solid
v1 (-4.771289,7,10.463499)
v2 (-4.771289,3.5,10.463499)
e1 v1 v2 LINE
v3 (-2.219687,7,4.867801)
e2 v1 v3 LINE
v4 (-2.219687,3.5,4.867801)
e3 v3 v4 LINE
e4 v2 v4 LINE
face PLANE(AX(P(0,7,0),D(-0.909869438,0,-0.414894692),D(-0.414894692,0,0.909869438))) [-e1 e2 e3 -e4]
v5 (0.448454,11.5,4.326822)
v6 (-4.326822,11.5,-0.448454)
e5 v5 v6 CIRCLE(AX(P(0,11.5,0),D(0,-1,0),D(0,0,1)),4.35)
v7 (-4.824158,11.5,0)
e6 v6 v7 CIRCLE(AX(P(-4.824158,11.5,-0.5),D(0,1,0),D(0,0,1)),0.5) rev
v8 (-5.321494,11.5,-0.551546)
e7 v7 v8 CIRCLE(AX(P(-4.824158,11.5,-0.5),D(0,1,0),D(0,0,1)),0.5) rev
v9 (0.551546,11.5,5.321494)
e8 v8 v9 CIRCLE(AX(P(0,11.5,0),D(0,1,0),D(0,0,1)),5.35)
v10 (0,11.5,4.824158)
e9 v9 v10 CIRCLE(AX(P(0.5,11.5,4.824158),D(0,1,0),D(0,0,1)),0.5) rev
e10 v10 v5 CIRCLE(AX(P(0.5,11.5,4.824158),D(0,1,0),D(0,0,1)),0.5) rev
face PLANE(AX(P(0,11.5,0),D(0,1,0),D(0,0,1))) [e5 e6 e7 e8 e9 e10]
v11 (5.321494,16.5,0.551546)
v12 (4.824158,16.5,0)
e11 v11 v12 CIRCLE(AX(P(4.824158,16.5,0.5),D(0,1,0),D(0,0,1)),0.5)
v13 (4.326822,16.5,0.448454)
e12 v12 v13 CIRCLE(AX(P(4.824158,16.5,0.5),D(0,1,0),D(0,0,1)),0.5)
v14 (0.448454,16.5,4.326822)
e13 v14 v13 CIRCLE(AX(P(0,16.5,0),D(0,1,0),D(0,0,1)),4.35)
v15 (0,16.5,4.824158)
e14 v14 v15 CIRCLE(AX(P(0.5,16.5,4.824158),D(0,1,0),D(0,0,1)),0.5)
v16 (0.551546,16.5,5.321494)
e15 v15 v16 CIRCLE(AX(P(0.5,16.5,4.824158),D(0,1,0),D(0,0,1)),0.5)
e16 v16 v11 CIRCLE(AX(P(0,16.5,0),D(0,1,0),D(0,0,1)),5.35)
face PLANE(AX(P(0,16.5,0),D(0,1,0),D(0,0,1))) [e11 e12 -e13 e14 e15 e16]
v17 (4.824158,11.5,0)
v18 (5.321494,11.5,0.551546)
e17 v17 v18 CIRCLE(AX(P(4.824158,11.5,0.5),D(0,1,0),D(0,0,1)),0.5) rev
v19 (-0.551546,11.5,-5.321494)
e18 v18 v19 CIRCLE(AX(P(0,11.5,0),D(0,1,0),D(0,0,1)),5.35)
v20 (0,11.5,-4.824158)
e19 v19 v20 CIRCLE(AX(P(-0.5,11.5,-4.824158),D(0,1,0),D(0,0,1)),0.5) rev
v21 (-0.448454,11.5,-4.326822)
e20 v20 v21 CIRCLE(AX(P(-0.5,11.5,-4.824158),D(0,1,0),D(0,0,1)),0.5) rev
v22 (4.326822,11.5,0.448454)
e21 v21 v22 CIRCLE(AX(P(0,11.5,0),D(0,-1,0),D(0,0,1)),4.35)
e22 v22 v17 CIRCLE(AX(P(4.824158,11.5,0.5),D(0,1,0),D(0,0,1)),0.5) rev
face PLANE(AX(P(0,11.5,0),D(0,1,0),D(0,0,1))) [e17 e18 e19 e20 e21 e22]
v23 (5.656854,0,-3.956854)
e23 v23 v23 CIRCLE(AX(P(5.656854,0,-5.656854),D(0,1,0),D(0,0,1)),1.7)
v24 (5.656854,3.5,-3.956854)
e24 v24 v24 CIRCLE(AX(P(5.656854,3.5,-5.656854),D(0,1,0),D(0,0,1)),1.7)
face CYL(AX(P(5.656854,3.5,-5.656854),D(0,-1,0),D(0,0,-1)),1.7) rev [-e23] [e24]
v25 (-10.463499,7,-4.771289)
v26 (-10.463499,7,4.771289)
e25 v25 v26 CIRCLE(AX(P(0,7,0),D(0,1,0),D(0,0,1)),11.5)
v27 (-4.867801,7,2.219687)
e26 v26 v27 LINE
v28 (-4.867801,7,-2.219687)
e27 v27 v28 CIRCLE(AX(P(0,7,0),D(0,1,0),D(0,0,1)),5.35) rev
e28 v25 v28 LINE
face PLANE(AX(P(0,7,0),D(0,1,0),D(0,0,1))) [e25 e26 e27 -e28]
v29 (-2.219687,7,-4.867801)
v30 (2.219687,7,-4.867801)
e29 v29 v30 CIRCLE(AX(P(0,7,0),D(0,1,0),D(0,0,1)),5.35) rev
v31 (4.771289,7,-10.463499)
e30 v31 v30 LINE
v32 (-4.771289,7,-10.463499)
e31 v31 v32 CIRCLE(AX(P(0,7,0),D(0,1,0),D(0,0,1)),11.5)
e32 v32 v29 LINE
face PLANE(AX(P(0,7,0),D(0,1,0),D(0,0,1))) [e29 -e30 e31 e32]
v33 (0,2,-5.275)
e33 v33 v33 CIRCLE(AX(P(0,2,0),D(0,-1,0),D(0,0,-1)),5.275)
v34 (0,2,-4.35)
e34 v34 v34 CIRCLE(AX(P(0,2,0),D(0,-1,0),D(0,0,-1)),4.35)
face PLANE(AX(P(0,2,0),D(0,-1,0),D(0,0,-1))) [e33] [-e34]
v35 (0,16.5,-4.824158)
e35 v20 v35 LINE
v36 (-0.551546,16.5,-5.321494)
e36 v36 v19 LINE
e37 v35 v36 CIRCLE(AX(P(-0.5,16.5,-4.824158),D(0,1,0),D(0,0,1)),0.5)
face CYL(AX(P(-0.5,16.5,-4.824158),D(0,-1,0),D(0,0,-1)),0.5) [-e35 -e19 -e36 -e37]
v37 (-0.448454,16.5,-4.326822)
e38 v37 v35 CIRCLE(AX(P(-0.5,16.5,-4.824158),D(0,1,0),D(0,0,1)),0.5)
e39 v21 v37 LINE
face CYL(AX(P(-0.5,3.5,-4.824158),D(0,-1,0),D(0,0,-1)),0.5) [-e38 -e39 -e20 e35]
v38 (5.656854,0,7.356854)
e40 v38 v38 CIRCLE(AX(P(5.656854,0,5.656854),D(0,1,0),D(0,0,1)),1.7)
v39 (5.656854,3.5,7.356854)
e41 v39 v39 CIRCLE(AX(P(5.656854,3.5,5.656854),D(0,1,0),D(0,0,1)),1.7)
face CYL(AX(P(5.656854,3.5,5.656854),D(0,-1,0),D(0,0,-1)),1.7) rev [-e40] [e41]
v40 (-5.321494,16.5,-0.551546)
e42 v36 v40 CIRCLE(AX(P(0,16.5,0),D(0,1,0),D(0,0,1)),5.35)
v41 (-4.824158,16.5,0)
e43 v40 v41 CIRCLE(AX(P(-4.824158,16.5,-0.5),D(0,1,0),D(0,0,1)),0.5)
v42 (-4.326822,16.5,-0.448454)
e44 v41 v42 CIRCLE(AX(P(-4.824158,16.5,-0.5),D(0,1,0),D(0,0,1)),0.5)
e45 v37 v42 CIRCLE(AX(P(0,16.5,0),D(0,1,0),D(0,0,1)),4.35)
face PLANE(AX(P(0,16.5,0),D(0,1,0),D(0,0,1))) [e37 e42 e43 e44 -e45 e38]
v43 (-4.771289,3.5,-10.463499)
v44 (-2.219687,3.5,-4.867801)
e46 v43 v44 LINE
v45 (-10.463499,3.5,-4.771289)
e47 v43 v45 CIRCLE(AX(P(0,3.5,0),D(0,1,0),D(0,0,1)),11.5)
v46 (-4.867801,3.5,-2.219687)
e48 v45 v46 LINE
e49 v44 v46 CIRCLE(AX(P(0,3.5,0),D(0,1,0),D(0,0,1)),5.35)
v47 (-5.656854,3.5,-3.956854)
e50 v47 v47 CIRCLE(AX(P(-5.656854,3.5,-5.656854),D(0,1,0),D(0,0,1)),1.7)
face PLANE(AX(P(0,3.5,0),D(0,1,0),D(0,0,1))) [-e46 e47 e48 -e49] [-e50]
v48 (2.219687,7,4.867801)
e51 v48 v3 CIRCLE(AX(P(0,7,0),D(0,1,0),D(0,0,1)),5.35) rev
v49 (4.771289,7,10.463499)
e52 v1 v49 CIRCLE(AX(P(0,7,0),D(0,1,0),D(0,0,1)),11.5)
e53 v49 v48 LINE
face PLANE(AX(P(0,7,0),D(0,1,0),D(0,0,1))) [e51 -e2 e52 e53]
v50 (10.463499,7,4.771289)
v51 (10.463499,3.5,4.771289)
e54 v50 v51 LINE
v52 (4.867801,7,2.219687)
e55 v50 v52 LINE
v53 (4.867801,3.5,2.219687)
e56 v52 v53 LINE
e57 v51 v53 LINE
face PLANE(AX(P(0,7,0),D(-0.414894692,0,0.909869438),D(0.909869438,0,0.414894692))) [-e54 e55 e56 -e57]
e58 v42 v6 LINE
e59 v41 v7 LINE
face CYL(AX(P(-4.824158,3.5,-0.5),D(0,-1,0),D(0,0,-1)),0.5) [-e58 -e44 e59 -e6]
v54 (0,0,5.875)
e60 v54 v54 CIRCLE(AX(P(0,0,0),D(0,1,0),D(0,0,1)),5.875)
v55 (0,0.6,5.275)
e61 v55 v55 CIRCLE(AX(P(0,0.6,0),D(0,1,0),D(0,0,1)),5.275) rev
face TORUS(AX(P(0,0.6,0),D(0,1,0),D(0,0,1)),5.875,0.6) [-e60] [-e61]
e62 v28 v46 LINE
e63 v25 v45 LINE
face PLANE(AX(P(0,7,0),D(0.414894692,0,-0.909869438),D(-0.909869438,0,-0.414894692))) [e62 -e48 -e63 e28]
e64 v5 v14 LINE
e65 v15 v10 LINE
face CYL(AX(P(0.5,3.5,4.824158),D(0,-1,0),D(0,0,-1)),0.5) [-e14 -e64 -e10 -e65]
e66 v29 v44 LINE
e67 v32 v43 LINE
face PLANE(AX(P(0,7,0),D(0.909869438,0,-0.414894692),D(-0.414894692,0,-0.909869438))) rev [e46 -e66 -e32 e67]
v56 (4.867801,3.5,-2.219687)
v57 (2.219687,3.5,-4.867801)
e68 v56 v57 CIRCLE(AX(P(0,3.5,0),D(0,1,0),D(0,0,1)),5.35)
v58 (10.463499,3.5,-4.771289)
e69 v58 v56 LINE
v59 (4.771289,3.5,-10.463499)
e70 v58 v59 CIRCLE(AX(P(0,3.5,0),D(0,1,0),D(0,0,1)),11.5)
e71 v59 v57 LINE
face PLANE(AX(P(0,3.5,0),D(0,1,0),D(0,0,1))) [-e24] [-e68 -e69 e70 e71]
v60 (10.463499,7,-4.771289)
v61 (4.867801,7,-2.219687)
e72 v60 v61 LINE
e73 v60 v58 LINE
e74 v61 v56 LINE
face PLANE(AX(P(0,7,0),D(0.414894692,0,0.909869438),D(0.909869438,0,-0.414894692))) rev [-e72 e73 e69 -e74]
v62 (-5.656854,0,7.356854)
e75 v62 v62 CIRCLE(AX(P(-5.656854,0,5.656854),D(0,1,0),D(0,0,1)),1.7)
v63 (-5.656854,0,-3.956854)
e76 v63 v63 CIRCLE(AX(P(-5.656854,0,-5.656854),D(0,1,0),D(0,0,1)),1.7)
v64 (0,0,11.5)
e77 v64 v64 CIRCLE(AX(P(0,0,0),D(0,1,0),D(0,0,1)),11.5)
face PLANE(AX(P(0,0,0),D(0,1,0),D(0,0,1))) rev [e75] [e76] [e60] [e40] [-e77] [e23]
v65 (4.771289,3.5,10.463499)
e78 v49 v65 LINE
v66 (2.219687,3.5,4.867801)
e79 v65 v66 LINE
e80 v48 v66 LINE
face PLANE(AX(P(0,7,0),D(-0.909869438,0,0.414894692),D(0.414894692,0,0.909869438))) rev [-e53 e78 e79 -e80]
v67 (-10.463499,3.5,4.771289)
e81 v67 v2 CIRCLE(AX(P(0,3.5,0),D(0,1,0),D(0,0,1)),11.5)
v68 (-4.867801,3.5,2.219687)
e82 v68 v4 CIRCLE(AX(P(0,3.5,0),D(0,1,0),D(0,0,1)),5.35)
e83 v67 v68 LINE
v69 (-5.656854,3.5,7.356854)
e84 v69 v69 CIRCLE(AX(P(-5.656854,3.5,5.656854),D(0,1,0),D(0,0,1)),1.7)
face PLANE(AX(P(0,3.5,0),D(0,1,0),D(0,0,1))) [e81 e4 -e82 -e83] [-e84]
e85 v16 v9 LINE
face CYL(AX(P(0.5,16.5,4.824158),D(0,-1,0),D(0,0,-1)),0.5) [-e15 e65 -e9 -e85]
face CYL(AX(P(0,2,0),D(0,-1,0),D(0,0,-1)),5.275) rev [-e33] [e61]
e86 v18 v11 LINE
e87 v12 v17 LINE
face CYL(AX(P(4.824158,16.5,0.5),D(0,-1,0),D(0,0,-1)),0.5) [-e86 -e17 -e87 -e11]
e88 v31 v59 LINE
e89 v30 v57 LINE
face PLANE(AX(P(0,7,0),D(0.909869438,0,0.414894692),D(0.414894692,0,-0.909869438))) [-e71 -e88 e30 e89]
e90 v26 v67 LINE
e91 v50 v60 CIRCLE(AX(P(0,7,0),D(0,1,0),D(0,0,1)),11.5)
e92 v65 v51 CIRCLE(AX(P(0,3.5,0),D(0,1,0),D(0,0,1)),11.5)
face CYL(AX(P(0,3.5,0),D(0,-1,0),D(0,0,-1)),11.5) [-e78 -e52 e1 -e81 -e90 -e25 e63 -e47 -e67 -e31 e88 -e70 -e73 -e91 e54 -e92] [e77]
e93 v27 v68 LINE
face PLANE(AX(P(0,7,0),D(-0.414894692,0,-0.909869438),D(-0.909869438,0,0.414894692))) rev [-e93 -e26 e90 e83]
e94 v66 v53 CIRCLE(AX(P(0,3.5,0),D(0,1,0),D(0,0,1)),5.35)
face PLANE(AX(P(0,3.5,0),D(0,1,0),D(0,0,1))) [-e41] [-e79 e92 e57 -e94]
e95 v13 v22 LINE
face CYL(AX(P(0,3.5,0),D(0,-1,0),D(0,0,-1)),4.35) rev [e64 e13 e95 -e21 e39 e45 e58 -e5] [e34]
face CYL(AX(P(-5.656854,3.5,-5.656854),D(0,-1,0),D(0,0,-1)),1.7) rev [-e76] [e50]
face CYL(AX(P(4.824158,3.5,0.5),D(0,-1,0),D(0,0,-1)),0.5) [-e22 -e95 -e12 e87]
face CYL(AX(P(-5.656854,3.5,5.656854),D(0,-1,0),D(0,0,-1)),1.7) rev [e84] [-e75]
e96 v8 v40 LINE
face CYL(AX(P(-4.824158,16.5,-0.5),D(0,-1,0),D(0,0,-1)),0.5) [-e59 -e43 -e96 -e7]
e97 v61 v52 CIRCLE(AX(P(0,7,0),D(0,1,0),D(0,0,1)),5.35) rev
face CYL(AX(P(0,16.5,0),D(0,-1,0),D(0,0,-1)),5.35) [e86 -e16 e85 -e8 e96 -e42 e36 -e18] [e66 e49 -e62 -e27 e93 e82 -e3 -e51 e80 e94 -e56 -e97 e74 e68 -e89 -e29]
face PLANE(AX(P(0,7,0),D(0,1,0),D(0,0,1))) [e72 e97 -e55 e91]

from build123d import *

# Parameters (mm, degrees)
CROQUIS1_R              = 11.5
CROQUIS1_R_2            = 4.35
CROQUIS1_R_3            = 1.7000000000000004
SALIENTE_EXTRUIR1_DEPTH = 3.5
CROQUIS2_R              = 5.35
CROQUIS2_R_2            = 4.35
SALIENTE_EXTRUIR2_DEPTH = 13
CORTAR_EXTRUIR1_START   = -5
CORTAR_EXTRUIR1_DEPTH   = 5
CROQUIS4_R              = 5.275
CROQUIS4_R_2            = 4.35
CORTAR_EXTRUIR2_DEPTH   = 2
REDONDEO1_R             = 0.6
REDONDEO2_R             = 0.5
SALIENTE_EXTRUIR3_DEPTH = 3.5


with BuildPart() as part:
    # Croquis1 → Saliente-Extruir1 (new body)
    with BuildSketch(Plane(origin=(0, 0, 0), x_dir=(1, 0, 0), z_dir=(0, 1, 0))):
        with Locations(Location((1.731948e-11, 0, 0), (0, 0, 270))):
            Circle(CROQUIS1_R)
        with Locations(Location((1.731948e-11, 0, 0), (0, 0, 270))):
            Circle(CROQUIS1_R_2, mode=Mode.SUBTRACT)
        with Locations(Location((5.656854249492441, 5.65685424949238, 0), (0, 0, 270))):
            Circle(CROQUIS1_R_3, mode=Mode.SUBTRACT)
        with Locations(Location((-5.656854249492318, 5.656854249492381, 0), (0, 0, 270))):
            Circle(CROQUIS1_R_3, mode=Mode.SUBTRACT)
        with Locations(Location((-5.656854249492318, -5.656854249492381, 0), (0, 0, 270))):
            Circle(CROQUIS1_R_3, mode=Mode.SUBTRACT)
        with Locations(Location((5.656854249492441, -5.65685424949238, 0), (0, 0, 270))):
            Circle(CROQUIS1_R_3, mode=Mode.SUBTRACT)
    extrude(amount=SALIENTE_EXTRUIR1_DEPTH)

    # Croquis2 → Saliente-Extruir2 (add)
    with BuildSketch(Plane(origin=(0, 3.5, 0), x_dir=(1, 0, 0), z_dir=(0, 1, 0))):
        with Locations(Location((1.731948e-11, 0, 0), (0, 0, 90))):
            Circle(CROQUIS2_R)
        with Locations(Location((1.731948e-11, 0, 0), (0, 0, 270))):
            Circle(CROQUIS2_R_2, mode=Mode.SUBTRACT)
    extrude(amount=SALIENTE_EXTRUIR2_DEPTH)

    # Croquis3 → Cortar-Extruir1 (cut)
    with BuildSketch(Plane(origin=(0, 16.5, 0), x_dir=(1, 0, 0), z_dir=(0, 1, 0)).offset(CORTAR_EXTRUIR1_START)):
        with BuildLine():
            Line((1.732086e-11, 5.35), (1.732072e-11, 4.35))
            ThreePointArc((1.732072e-11, 4.35), (3.0759144981543076, 3.0759144981369877), (4.34999999998268, 0))
            Line((4.34999999998268, 0), (5.34999999998268, 0))
            ThreePointArc((5.34999999998268, 0), (3.783021279340855, 3.783021279323535), (1.732086e-11, 5.35))
        make_face()
        with BuildLine():
            Line((1.732086e-11, -5.35), (1.732072e-11, -4.35))
            ThreePointArc((1.732072e-11, -4.35), (-3.075914498144163, -3.075914498161481), (-4.34999999998268, 0))
            Line((-4.34999999998268, 0), (-5.34999999998268, 0))
            ThreePointArc((-5.34999999998268, 0), (-3.7830212793307103, -3.7830212793480285), (1.732086e-11, -5.35))
        make_face()
    extrude(amount=CORTAR_EXTRUIR1_DEPTH, mode=Mode.SUBTRACT)

    # Croquis4 → Cortar-Extruir2 (cut)
    with BuildSketch(Plane.XZ):
        with Locations(Location((1.731948e-11, 0, 0), (0, 0, 270))):
            Circle(CROQUIS4_R)
        with Locations(Location((1.731948e-11, 0, 0), (0, 0, 270))):
            Circle(CROQUIS4_R_2, mode=Mode.SUBTRACT)
    extrude(amount=-CORTAR_EXTRUIR2_DEPTH, mode=Mode.SUBTRACT)

    # Redondeo1
    redondeo1_edges = [part.edges().sort_by_distance(p)[0] for p in [
        (1.732109e-11, 0, 5.275),
    ]]
    fillet(redondeo1_edges, radius=REDONDEO1_R)

    # Redondeo2
    # the kernel refuses this fillet: 0.5 mm, written as the material it takes off along each edge
    with BuildSketch(Plane(origin=(-4.34999999998268, 11.5, -2.1e-16), x_dir=(0.05161519234821224, 0, -0.9986670475783493), z_dir=(0, 1, 0))) as redondeo2_piece_1:
        with BuildLine():
            CenterArc((0.4748597696035476, 0.49933352378917434), REDONDEO2_R, 182.9586473758917, 84.08270524821648)
            Line((-0.02447375418562714, 0.4735259276150691), (0, 0))
            ThreePointArc((0, 0), (0.22452608671472166, 0.00579834303418057), (0.44905217342944187, 0))
        make_face()
    extrude(amount=6.185394894032285, mode=Mode.SUBTRACT)
    with BuildSketch(Plane(origin=(-5.34999999998268, 11.5, 0), x_dir=(1, 0, 0), z_dir=(0, 1, 0))) as redondeo2_piece_2:
        with BuildLine():
            CenterArc((0.5258420423870858, 0.5), REDONDEO2_R, 174.0827052482164, 95.91729475178363)
            ThreePointArc((0.02850617046822901, 0.5515463917525775), (0.00713129545583069, 0.2761412790629337), (0, 0))
            Line((0, 0), (0.5258420423870858, 0))
        make_face()
    extrude(amount=6.380706395314668, mode=Mode.SUBTRACT)
    with BuildSketch(Plane(origin=(1.7321e-11, 11.5, 5.35), x_dir=(-3.5e-16, 0, -1), z_dir=(0, 1, 0))) as redondeo2_piece_3:
        with BuildLine():
            CenterArc((0.5258420423870855, -0.5), REDONDEO2_R, 89.99999999999997, 95.91729475178352)
            ThreePointArc((0.02850617046822881, -0.5515463917525766), (0.00713129545583059, -0.27614127906293173), (0, 0))
            Line((0, 0), (0.5258420423870858, 0))
        make_face()
    extrude(amount=6.3807063953146645, mode=Mode.SUBTRACT)
    with BuildSketch(Plane(origin=(1.731868e-11, 11.5, 4.35), x_dir=(0.9986670475783493, 0, -0.051615192348211894), z_dir=(0, 1, 0))) as redondeo2_piece_4:
        with BuildLine():
            CenterArc((0.474859769603551, -0.49933352378917434), REDONDEO2_R, 92.95864737589183, 84.08270524821639)
            Line((-0.0244737541856237, -0.4735259276150684), (0, 0))
            ThreePointArc((0, 0), (0.2245260867147224, -0.00579834303418053), (0.4490521734294448, 0))
        make_face()
    extrude(amount=6.185394894032285, mode=Mode.SUBTRACT)
    with BuildSketch(Plane(origin=(1.732072e-11, 11.5, -4.35), x_dir=(-0.9986670475783493, 0, 0.05161519234821218), z_dir=(0, 1, 0))) as redondeo2_piece_5:
        with BuildLine():
            CenterArc((0.474859769603548, -0.49933352378917434), REDONDEO2_R, 92.95864737589177, 84.08270524821641)
            Line((-0.02447375418562666, -0.47352592761506823), (0, 0))
            ThreePointArc((0, 0), (0.22452608671472019, -0.00579834303418048), (0.4490521734294423, 0))
        make_face()
    extrude(amount=6.185394894032285, mode=Mode.SUBTRACT)
    with BuildSketch(Plane(origin=(1.731981e-11, 11.5, -5.35), x_dir=(1.91e-15, 0, 1), z_dir=(0, 1, 0))) as redondeo2_piece_6:
        with BuildLine():
            CenterArc((0.5258420423870848, -0.5), REDONDEO2_R, 89.99999999999989, 95.91729475178357)
            ThreePointArc((0.02850617046822795, -0.5515463917525762), (0.00713129545583016, -0.2761412790629328), (0, 0))
            Line((0, 0), (0.5258420423870858, 0))
        make_face()
    extrude(amount=6.3807063953146645, mode=Mode.SUBTRACT)
    with BuildSketch(Plane(origin=(4.34999999998268, 11.5, 1.9e-16), x_dir=(-0.05161519227127975, 0, 0.9986670475823255), z_dir=(0, 1, 0))) as redondeo2_piece_7:
        with BuildLine():
            CenterArc((0.47485976964022647, 0.4993335237871862), REDONDEO2_R, 182.95864737147792, 84.08270524821648)
            Line((-0.02447375415093636, 0.4735259276515472), (0, 0))
            ThreePointArc((0, 0), (0.22452608671427532, 0.00579834305147695), (0.44905217342765447, 0))
        make_face()
    extrude(amount=6.1853948941188825, mode=Mode.SUBTRACT)
    with BuildSketch(Plane(origin=(5.34999999998268, 11.5, 0), x_dir=(-1, 0, 0), z_dir=(0, 1, 0))) as redondeo2_piece_8:
        with BuildLine():
            CenterArc((0.5258420423524468, 0.5), REDONDEO2_R, 174.08270524821663, 95.9172947517834)
            ThreePointArc((0.02850617043358916, 0.5515463917525757), (0.00713129542123792, 0.2761412790638253), (0, 0))
            Line((0, 0), (0.5258420423524468, 0))
        make_face()
    extrude(amount=6.380706395310192, mode=Mode.SUBTRACT)

    # Croquis5 → Saliente-Extruir3 (add)
    with BuildSketch(Plane(origin=(0, 3.5, 0), x_dir=(1, 0, 0), z_dir=(0, 1, 0))):
        with BuildLine():
            Line((-4.867801495370659, 2.219686599837588), (-10.46349854147086, 4.7712889529219185))
            ThreePointArc((-10.46349854147086, 4.7712889529219185), (-11.49999999998268, 1.41e-15), (-10.46349854147086, -4.771288952921916))
            Line((-10.46349854147086, -4.771288952921914), (-4.86780149537066, -2.219686599837586))
            ThreePointArc((-4.86780149537066, -2.219686599837586), (-5.34999999998268, 8.9e-16), (-4.86780149537066, 2.219686599837588))
        make_face()
        with BuildLine():
            Line((-2.2196865998351183, -4.867801495381207), (-4.77128895293652, -10.463498541473625))
            ThreePointArc((-4.771288952936522, -10.463498541473623), (-6.77758e-12, -11.5), (4.771288952927311, -10.463498541493617))
            Line((4.771288952927309, -10.46349854149362), (2.2196865998493576, -4.86780149539051))
            ThreePointArc((2.219686599849358, -4.867801495390509), (6.10956e-12, -5.35), (-2.219686599835118, -4.867801495381206))
        make_face()
        with BuildLine():
            ThreePointArc((11.50000000001732, 0), (11.237887551221265, 2.4412872396535783), (10.463498541496383, 4.771288952941911))
            Line((10.463498541496381, 4.7712889529419105), (4.867801495401058, 2.2196865998468893))
            ThreePointArc((4.867801495401059, 2.2196865998468898), (5.228060730360026, 1.1357292810562294), (5.350000000017321, -1.1e-16))
            ThreePointArc((5.350000000017321, -1.1e-16), (5.228060730360026, -1.1357292810562303), (4.867801495401057, -2.2196865998468898))
            Line((4.867801495401058, -2.2196865998468898), (10.463498541496381, -4.771288952941912))
            ThreePointArc((10.463498541496378, -4.7712889529419185), (11.237887551221265, -2.4412872396535787), (11.50000000001732, -2.82e-15))
        make_face()
        with BuildLine():
            ThreePointArc((4.771288952927309, 10.46349854149362), (-6.77732e-12, 11.5), (-4.771288952936519, 10.463498541473625))
            Line((-4.771288952936519, 10.463498541473623), (-2.2196865998351187, 4.867801495381207))
            ThreePointArc((-2.219686599835118, 4.867801495381207), (6.10867e-12, 5.35), (2.219686599849357, 4.86780149539051))
            Line((2.2196865998493576, 4.86780149539051), (4.771288952927309, 10.46349854149362))
        make_face()
    extrude(amount=SALIENTE_EXTRUIR3_DEPTH)


solid = part.part
